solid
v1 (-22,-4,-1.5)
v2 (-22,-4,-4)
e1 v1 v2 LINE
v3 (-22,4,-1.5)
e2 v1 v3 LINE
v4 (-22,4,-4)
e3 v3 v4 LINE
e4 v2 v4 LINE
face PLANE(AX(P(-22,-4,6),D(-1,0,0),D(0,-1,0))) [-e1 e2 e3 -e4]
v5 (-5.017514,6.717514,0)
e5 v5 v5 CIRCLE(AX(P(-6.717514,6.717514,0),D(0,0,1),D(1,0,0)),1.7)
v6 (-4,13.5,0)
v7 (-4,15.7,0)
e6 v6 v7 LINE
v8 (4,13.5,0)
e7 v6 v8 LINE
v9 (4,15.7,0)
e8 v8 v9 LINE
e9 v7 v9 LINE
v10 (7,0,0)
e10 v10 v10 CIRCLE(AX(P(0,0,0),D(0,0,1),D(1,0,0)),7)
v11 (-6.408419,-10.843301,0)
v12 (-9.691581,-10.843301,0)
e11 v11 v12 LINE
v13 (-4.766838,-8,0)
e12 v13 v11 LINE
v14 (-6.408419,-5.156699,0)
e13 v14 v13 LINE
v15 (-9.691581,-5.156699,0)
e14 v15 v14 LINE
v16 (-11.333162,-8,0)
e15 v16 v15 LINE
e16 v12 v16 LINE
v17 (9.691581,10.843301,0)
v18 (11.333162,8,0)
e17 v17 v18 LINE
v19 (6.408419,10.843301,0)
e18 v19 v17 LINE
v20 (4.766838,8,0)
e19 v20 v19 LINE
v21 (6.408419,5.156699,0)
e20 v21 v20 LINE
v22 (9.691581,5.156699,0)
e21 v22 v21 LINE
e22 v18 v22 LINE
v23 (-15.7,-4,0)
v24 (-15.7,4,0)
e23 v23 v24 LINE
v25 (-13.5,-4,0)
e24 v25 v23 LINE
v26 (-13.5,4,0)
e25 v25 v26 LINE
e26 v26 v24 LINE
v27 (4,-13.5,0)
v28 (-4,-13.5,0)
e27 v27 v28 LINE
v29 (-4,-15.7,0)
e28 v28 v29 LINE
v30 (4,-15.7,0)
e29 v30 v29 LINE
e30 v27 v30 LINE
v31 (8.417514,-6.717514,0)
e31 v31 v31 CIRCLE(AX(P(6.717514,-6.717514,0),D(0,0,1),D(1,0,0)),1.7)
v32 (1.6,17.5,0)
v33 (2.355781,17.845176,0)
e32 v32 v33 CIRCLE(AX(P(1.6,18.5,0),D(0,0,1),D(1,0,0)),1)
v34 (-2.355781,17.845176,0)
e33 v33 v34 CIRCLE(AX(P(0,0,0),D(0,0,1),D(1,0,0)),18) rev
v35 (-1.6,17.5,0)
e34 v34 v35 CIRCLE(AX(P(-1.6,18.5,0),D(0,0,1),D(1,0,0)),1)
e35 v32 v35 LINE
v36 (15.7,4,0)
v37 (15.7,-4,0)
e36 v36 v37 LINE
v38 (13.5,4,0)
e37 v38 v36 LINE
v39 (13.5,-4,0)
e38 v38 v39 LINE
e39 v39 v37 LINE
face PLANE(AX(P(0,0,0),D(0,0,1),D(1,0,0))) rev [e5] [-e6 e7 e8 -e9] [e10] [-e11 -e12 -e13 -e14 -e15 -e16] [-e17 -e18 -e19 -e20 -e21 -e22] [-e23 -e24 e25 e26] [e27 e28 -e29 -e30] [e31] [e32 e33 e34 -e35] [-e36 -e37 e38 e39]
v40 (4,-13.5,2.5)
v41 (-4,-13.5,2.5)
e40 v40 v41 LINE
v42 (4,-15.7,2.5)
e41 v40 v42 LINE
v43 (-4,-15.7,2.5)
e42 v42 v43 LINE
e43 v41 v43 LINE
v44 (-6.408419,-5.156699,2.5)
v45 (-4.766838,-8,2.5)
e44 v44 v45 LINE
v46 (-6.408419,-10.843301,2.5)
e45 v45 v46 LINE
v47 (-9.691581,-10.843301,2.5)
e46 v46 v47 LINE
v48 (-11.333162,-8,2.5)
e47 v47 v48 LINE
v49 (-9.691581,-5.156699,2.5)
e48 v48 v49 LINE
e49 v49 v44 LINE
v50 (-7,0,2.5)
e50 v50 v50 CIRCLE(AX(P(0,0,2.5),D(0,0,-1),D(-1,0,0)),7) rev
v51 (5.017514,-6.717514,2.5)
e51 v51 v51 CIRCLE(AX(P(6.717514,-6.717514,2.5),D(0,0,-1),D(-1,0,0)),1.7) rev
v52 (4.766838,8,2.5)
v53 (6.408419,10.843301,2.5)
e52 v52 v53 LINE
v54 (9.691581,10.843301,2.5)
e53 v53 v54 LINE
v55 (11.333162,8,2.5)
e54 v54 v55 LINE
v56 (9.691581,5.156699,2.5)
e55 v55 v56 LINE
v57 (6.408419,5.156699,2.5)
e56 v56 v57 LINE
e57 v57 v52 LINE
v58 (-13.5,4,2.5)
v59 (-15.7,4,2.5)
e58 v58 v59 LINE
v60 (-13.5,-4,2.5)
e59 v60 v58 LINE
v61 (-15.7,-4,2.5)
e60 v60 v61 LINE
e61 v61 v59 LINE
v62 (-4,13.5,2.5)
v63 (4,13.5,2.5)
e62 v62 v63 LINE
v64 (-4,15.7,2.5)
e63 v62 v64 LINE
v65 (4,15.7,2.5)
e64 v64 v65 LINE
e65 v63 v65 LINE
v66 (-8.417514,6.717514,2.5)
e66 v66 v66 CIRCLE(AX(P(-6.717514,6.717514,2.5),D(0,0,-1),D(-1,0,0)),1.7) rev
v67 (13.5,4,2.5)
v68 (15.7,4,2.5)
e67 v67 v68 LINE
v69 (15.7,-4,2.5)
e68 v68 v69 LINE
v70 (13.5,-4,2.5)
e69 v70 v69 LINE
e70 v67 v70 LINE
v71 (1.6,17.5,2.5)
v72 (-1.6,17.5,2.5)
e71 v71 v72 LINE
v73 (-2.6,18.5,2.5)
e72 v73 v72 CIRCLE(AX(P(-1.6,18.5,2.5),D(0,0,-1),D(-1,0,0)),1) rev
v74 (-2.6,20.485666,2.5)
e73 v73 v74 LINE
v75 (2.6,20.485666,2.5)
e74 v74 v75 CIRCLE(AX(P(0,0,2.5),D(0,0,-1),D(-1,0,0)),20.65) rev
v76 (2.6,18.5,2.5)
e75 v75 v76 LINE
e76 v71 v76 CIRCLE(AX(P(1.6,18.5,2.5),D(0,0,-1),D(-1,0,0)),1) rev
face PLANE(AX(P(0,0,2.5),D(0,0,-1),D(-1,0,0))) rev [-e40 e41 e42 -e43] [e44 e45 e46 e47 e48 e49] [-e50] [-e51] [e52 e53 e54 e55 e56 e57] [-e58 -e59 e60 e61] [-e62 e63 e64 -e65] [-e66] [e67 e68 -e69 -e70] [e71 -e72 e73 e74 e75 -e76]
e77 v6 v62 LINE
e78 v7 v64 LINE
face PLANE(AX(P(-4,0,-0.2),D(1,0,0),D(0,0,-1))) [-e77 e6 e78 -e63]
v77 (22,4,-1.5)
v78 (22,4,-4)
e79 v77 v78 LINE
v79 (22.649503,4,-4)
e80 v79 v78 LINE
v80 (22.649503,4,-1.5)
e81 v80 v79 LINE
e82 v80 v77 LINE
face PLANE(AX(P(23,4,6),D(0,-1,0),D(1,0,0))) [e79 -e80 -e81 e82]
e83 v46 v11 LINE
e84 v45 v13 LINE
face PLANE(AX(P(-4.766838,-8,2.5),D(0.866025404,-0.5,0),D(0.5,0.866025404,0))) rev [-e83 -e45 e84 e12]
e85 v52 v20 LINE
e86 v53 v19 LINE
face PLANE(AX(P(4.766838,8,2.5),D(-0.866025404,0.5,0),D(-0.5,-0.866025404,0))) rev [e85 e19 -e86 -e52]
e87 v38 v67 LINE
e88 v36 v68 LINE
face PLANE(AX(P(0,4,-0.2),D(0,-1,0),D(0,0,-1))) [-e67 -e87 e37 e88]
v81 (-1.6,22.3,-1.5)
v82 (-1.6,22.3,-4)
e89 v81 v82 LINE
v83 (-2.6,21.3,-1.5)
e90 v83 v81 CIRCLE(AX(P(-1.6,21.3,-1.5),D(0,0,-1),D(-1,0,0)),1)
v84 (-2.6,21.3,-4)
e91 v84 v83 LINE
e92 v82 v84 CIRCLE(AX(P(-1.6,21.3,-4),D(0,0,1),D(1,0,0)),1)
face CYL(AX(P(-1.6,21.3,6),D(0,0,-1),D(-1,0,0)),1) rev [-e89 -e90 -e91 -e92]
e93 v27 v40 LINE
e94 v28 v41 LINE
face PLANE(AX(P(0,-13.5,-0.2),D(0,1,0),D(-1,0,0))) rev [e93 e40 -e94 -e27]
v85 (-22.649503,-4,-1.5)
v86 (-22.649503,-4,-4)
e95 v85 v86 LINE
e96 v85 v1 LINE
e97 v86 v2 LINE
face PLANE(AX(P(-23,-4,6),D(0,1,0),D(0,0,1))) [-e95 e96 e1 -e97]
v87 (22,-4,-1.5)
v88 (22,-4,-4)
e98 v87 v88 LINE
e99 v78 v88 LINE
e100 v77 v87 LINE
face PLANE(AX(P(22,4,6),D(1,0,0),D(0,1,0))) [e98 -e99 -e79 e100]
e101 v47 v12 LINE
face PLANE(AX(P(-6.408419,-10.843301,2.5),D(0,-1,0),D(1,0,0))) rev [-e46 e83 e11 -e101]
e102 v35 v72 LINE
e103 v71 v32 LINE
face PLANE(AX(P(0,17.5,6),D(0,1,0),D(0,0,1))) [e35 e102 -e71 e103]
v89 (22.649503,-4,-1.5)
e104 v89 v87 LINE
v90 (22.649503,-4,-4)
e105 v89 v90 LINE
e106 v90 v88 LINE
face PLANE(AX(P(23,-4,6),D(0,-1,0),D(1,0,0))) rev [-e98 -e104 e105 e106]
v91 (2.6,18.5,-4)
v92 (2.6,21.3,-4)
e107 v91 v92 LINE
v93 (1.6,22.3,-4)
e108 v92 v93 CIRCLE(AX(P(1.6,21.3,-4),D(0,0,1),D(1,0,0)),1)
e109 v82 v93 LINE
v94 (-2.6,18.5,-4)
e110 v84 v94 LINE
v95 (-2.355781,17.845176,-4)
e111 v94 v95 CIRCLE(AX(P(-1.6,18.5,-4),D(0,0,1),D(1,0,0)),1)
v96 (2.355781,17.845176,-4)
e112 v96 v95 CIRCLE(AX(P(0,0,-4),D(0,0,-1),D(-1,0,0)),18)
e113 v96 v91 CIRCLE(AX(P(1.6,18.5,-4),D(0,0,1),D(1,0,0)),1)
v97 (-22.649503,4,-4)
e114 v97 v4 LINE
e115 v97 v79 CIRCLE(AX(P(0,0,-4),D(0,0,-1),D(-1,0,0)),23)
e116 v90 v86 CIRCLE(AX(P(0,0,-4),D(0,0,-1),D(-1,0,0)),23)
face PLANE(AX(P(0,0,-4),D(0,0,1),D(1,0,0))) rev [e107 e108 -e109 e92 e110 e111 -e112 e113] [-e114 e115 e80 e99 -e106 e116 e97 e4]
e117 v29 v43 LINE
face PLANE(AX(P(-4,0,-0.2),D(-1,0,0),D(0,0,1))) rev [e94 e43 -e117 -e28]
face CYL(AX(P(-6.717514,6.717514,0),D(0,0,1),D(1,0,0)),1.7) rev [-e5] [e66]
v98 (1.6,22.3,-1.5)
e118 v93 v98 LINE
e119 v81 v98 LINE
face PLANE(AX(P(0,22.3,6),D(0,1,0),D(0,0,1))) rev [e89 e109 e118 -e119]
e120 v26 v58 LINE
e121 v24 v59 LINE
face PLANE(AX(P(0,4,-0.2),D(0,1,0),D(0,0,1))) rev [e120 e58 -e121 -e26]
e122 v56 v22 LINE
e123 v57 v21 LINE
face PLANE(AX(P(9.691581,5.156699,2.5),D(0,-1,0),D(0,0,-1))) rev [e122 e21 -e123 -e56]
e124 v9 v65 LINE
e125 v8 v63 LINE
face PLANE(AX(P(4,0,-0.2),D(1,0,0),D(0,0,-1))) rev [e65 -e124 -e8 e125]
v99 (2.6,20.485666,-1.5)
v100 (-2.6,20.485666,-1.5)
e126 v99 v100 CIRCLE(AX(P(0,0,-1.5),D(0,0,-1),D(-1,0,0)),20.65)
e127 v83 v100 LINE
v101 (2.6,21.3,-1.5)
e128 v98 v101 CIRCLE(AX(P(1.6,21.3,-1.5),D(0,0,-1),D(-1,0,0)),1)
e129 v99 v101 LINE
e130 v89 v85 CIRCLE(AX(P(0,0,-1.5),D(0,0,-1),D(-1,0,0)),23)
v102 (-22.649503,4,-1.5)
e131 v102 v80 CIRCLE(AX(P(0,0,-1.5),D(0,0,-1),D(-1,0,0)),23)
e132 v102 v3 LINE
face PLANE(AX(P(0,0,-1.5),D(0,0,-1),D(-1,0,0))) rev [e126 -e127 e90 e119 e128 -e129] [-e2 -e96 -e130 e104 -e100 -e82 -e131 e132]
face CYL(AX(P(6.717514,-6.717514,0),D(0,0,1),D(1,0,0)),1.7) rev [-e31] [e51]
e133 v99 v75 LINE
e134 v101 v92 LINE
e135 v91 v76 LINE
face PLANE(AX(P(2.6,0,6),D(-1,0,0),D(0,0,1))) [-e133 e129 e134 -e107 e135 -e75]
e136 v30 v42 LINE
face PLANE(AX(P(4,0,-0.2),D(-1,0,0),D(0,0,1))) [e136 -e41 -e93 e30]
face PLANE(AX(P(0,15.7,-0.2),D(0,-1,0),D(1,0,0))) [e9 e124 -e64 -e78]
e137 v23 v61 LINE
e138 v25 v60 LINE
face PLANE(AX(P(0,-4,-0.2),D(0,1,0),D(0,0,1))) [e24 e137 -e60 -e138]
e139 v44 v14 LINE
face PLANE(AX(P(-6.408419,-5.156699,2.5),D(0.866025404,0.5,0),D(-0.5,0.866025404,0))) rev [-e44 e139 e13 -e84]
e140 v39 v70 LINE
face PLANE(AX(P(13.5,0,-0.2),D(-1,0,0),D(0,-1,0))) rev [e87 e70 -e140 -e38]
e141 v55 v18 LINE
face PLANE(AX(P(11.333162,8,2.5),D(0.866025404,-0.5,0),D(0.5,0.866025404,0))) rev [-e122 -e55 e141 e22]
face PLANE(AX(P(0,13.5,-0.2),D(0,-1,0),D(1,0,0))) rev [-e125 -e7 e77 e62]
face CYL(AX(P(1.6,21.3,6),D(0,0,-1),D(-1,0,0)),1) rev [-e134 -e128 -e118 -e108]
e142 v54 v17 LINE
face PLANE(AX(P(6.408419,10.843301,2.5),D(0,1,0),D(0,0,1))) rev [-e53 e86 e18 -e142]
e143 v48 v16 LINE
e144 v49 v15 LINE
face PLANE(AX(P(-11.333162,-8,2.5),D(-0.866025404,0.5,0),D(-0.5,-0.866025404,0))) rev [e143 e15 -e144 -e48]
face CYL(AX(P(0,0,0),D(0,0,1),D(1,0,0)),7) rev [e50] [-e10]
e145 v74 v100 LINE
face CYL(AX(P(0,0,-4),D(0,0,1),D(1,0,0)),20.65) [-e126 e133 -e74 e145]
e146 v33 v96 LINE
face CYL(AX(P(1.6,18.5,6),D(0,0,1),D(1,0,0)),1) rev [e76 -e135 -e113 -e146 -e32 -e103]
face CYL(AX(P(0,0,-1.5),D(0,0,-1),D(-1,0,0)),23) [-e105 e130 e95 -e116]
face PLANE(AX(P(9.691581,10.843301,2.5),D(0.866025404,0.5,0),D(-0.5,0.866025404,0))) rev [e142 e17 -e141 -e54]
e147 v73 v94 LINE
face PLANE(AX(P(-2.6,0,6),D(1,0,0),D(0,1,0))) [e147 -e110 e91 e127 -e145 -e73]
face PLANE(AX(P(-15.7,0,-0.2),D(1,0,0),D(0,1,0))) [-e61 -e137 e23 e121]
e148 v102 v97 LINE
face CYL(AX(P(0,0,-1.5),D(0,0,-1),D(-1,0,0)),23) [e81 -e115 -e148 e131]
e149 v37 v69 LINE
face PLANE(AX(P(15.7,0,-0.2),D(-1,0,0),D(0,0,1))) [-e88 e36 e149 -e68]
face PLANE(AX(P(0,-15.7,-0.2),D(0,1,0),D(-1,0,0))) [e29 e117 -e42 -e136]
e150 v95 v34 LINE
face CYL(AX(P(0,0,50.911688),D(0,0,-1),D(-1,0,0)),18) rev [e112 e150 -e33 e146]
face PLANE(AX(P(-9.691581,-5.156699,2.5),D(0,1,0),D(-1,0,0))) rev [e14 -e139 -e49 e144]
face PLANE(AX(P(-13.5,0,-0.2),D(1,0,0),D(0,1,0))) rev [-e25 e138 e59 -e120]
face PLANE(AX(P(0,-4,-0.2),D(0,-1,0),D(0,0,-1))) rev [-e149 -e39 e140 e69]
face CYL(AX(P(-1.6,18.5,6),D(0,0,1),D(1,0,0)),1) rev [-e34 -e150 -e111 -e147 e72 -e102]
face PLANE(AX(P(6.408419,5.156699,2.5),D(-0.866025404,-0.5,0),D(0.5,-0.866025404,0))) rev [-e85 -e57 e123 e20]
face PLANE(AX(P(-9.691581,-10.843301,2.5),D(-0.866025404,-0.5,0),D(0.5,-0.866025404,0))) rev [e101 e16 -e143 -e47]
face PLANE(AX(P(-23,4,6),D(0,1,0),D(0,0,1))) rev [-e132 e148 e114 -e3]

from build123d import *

# Parameters (mm, degrees)
SKETCH_1_R               = 17.4
EXTRUDE_1_DEPTH          = 5.6
SKETCH_2_R               = 1.7
CUT_EXTRUDE_1_DEPTH      = 26.23648153
SKETCH_3_R               = 7
CUT_EXTRUDE_2_DEPTH      = 26.23648153
SKETCH_4_R               = 2.8
CUT_EXTRUDE_3_DEPTH      = 3
SKETCH_5_R               = 1.7
CUT_EXTRUDE_4_DEPTH      = 26.23648153
CUT_EXTRUDE_5_DEPTH      = 2.5
SKETCH_7_W               = 16.1
SKETCH_7_H               = 16.1
CUT_EXTRUDE_6_DEPTH      = 1.5
CHAMFER_1_SIZE           = 0.5
SKETCH_9_W               = 2.2
SKETCH_9_H               = 8
SKETCH_9_W_2             = 8
SKETCH_9_H_2             = 2.2
CUT_EXTRUDE_7_DEPTH      = 26.281613873
BOSS_EXTRUDE1_DEPTH      = 5.6
BOSS_EXTRUDE1_DEPTH_BACK = 4
SKETCH1_R                = 20.65
SKETCH1_R_2              = 17.4
SKETCH3_R                = 23
SKETCH3_R_2              = 20.65
BOSS_EXTRUDE2_DEPTH      = 2.5
SKETCH4_R                = 18
CUT_EXTRUDE3_DEPTH       = 4
SKETCH5_W                = 1
SKETCH5_H                = 8
CUT_EXTRUDE4_DEPTH       = 10
CUT_EXTRUDE6_DEPTH       = 10
FILLET3_R                = 1
CUT_EXTRUDE7_START       = -3.1
SKETCH10_R               = 23
CUT_EXTRUDE7_DEPTH       = 3.1


with BuildPart() as part:
    # 草图1 → 凸台-拉伸1 (new body)
    with BuildSketch(Plane.XY):
        Circle(SKETCH_1_R)
    extrude(amount=EXTRUDE_1_DEPTH)

    # 草图2 → 切除-拉伸1 (cut, through all)
    with BuildSketch(Plane.XY.offset(5.6)):
        with Locations((-6.717514421, 6.717514421)):
            Circle(SKETCH_2_R)
        with Locations((6.717514421, -6.717514421)):
            Circle(SKETCH_2_R)
    extrude(amount=-CUT_EXTRUDE_1_DEPTH, mode=Mode.SUBTRACT)

    # 草图3 → 切除-拉伸2 (cut, through all)
    with BuildSketch(Plane.XY.offset(5.6)):
        Circle(SKETCH_3_R)
    extrude(amount=-CUT_EXTRUDE_2_DEPTH, mode=Mode.SUBTRACT)

    # 草图4 → 切除-拉伸3 (cut)
    with BuildSketch(Plane.XY.offset(5.6)):
        with Locations((-6.717514421, 6.717514421)):
            Circle(SKETCH_4_R)
        with Locations((6.717514421, -6.717514421)):
            Circle(SKETCH_4_R)
    extrude(amount=-CUT_EXTRUDE_3_DEPTH, mode=Mode.SUBTRACT)

    # 草图5 → 切除-拉伸4 (cut, through all)
    with BuildSketch(Plane.XY.offset(5.6)):
        with Locations((8.05, 8)):
            Circle(SKETCH_5_R)
        with Locations((-8.05, -8)):
            Circle(SKETCH_5_R)
    extrude(amount=-CUT_EXTRUDE_4_DEPTH, mode=Mode.SUBTRACT)

    # 草图6 → 切除-拉伸5 (cut)
    with BuildSketch(Plane(origin=(0, 0, 0), x_dir=(-1, 0, 0), z_dir=(0, 0, -1))):
        Polygon((4.766838493, -8), (6.408419246, -10.84330127), (9.691580754, -10.84330127), (11.333161507, -8), (9.691580754, -5.15669873), (6.408419246, -5.15669873), align=None)
        Polygon((-4.766838493, 8), (-6.408419246, 10.84330127), (-9.691580754, 10.84330127), (-11.333161507, 8), (-9.691580754, 5.15669873), (-6.408419246, 5.15669873), align=None)
    extrude(amount=-CUT_EXTRUDE_5_DEPTH, mode=Mode.SUBTRACT)

    # 草图7 → 切除-拉伸6 (cut)
    with BuildSketch(Plane.XY.offset(5.6)):
        Rectangle(SKETCH_7_W, SKETCH_7_H)
    extrude(amount=-CUT_EXTRUDE_6_DEPTH, mode=Mode.SUBTRACT)

    # 倒角1
    chamfer_1_edges = [part.edges().sort_by_distance(p)[0] for p in [
        (8.05, 1.022551258, 5.6),
        (1.047918985, 8.05, 5.6),
        (-8.05, -1.022551258, 5.6),
        (-1.047918985, -8.05, 5.6),
    ]]
    chamfer(chamfer_1_edges, length=CHAMFER_1_SIZE)

    # 草图8 → 旋转1 (revolve)
    with BuildSketch(Plane(origin=(0, 0, 0), x_dir=(0, 0, -1), z_dir=(1, 0, 0)), mode=Mode.PRIVATE) as revolve_1_sk:
        Polygon((0, 17.4), (0, 17.2), (0.2, 17.4), align=None)
    revolve(revolve_1_sk.sketch.rotate(Axis((0, 0, 0), (0, 0, 1)), 90), axis=Axis((0, 0, 0), (0, 0, 1)))

    # 草图9 → 切除-拉伸7 (cut, through all)
    with BuildSketch(Plane.XY.offset(5.6)):
        with Locations((14.6, 0)):
            Rectangle(SKETCH_9_W, SKETCH_9_H)
        with Locations((0, 14.6)):
            Rectangle(SKETCH_9_W_2, SKETCH_9_H_2)
        with Locations((-14.6, 0)):
            Rectangle(SKETCH_9_W, SKETCH_9_H)
        with Locations((0, -14.6)):
            Rectangle(SKETCH_9_W_2, SKETCH_9_H_2)
    extrude(amount=-CUT_EXTRUDE_7_DEPTH, mode=Mode.SUBTRACT)

    # Sketch1 → Boss-Extrude1 (add, two sides: drawn at the far end of the back side and taken through both)
    with BuildSketch(Plane.XY.offset(-BOSS_EXTRUDE1_DEPTH_BACK)):
        Circle(SKETCH1_R)
        Circle(SKETCH1_R_2, mode=Mode.SUBTRACT)
    extrude(amount=BOSS_EXTRUDE1_DEPTH + BOSS_EXTRUDE1_DEPTH_BACK)

    # Sketch3 → Boss-Extrude2 (add)
    with BuildSketch(Plane(origin=(0, 0, -4), x_dir=(-1, 0, 0), z_dir=(0, 0, -1))):
        Circle(SKETCH3_R)
        with Locations(Location((0, 0, 0), (0, 0, 180))):
            Circle(SKETCH3_R_2, mode=Mode.SUBTRACT)
    extrude(amount=-BOSS_EXTRUDE2_DEPTH)

    # Sketch4 → Cut-Extrude3 (cut)
    with BuildSketch(Plane(origin=(0, 0, -4), x_dir=(-1, 0, 0), z_dir=(0, 0, -1))):
        Circle(SKETCH4_R)
    extrude(amount=-CUT_EXTRUDE3_DEPTH, mode=Mode.SUBTRACT)

    # Sketch5 → Cut-Extrude4 (cut)
    with BuildSketch(Plane(origin=(0, 0, -4), x_dir=(-1, 0, 0), z_dir=(0, 0, -1))):
        with Locations((22.5, 0)):
            Rectangle(SKETCH5_W, SKETCH5_H)
        with Locations((-22.5, 0)):
            Rectangle(SKETCH5_W, SKETCH5_H)
    extrude(amount=-CUT_EXTRUDE4_DEPTH, mode=Mode.SUBTRACT)

    # Sketch7 → Cut-Extrude6 (cut)
    with BuildSketch(Plane(origin=(0, 0, -4), x_dir=(-1, 0, 0), z_dir=(0, 0, -1))):
        with BuildLine():
            Line((0, 18), (0, 22.3))
            Line((0, 22.3), (-2.6, 22.3))
            Line((-2.6, 22.3), (-2.6, 17.811232411))
            ThreePointArc((-2.6, 17.811232411), (-1.303421766, 17.952746077), (0, 18))
        make_face()
        with BuildLine():
            Line((0, 17.5), (0, 18))
            ThreePointArc((0, 18), (-1.303421766, 17.952746077), (-2.6, 17.811232411))
            Line((-2.6, 17.811232411), (-2.6, 17.5))
            Line((-2.6, 17.5), (0, 17.5))
        make_face()
        with BuildLine():
            Line((2.6, 22.3), (0, 22.3))
            Line((0, 22.3), (0, 18))
            ThreePointArc((0, 18), (1.303421766, 17.952746077), (2.6, 17.811232411))
            Line((2.6, 17.811232411), (2.6, 22.3))
        make_face()
        with BuildLine():
            ThreePointArc((2.6, 17.811232411), (1.303421766, 17.952746077), (0, 18))
            Line((0, 18), (0, 17.5))
            Line((0, 17.5), (2.6, 17.5))
            Line((2.6, 17.5), (2.6, 17.811232411))
        make_face()
    extrude(amount=-CUT_EXTRUDE6_DEPTH, mode=Mode.SUBTRACT)

    # Fillet3
    # the kernel refuses this fillet: 1 mm, written as the material it adds along each edge
    with BuildSketch(Plane(origin=(2.6, 22.3, -4), x_dir=(-1, 0, 0), z_dir=(0, 0, 1))) as fillet3_piece_1:
        with BuildLine():
            CenterArc((FILLET3_R, FILLET3_R), FILLET3_R, 180, 90)
            Line((0, FILLET3_R), (-FILLET3_R * 0.02, FILLET3_R))
            Line((-FILLET3_R * 0.02, FILLET3_R), (-FILLET3_R * 0.02, -FILLET3_R * 0.02))
            Line((-FILLET3_R * 0.02, -FILLET3_R * 0.02), (FILLET3_R, -FILLET3_R * 0.02))
            Line((FILLET3_R, -FILLET3_R * 0.02), (FILLET3_R, 0))
        make_face()
    extrude(amount=2.5)
    with BuildSketch(Plane(origin=(-2.6, 22.3, -4), x_dir=(1, 0, 0), z_dir=(0, 0, 1))) as fillet3_piece_2:
        with BuildLine():
            CenterArc((FILLET3_R, -FILLET3_R), FILLET3_R, 90, 90)
            Line((0, -FILLET3_R), (-FILLET3_R * 0.02, -FILLET3_R))
            Line((-FILLET3_R * 0.02, -FILLET3_R), (-FILLET3_R * 0.02, FILLET3_R * 0.02))
            Line((-FILLET3_R * 0.02, FILLET3_R * 0.02), (FILLET3_R, FILLET3_R * 0.02))
            Line((FILLET3_R, FILLET3_R * 0.02), (FILLET3_R, 0))
        make_face()
    extrude(amount=2.5)
    with BuildSketch(Plane(origin=(-2.6, 17.5, -6), x_dir=(0, 1, 0), z_dir=(0, 0, 1))) as fillet3_piece_3_section:
        with BuildLine():
            CenterArc((FILLET3_R, -FILLET3_R), FILLET3_R, 90, 90)
            Line((0, -FILLET3_R), (-FILLET3_R * 0.02, -FILLET3_R))
            Line((-FILLET3_R * 0.02, -FILLET3_R), (-FILLET3_R * 0.02, FILLET3_R * 0.02))
            Line((-FILLET3_R * 0.02, FILLET3_R * 0.02), (FILLET3_R, FILLET3_R * 0.02))
            Line((FILLET3_R, FILLET3_R * 0.02), (FILLET3_R, 0))
        make_face()
    fillet3_piece_3 = extrude(amount=11.6, mode=Mode.PRIVATE)
    fillet3_piece_3 = split(fillet3_piece_3, bisect_by=Plane(origin=(-2.544482942, 18.024809788, 0), z_dir=(0, 0, -1)), keep=Keep.TOP, mode=Mode.PRIVATE)
    fillet3_piece_3 = fillet3_piece_3 - Plane(origin=(0, 0, -2), x_dir=(-1, 0, 0), z_dir=(0, 0, -1)) * Cylinder(18, 28, mode=Mode.PRIVATE)
    fillet3_piece_3 = split(fillet3_piece_3, bisect_by=Plane(origin=(-2.544482942, 18.024809788, -4), z_dir=(0, 0, 1)), keep=Keep.TOP, mode=Mode.PRIVATE)
    add(fillet3_piece_3)
    with BuildSketch(Plane(origin=(-2.6, 17.5, 0), x_dir=(0, 1, 0), z_dir=(0, 0, 1))) as fillet3_piece_4_section:
        with BuildLine():
            CenterArc((FILLET3_R, -FILLET3_R), FILLET3_R, 90, 90)
            Line((0, -FILLET3_R), (-FILLET3_R * 0.02, -FILLET3_R))
            Line((-FILLET3_R * 0.02, -FILLET3_R), (-FILLET3_R * 0.02, FILLET3_R * 0.02))
            Line((-FILLET3_R * 0.02, FILLET3_R * 0.02), (FILLET3_R, FILLET3_R * 0.02))
            Line((FILLET3_R, FILLET3_R * 0.02), (FILLET3_R, 0))
        make_face()
    fillet3_piece_4 = extrude(amount=5.6, mode=Mode.PRIVATE)
    fillet3_piece_4 = fillet3_piece_4 - Plane(origin=(0, 0, 2.8), x_dir=(-1, 0, 0), z_dir=(0, 0, -1)) * Cylinder(18, 16, mode=Mode.PRIVATE)
    add(fillet3_piece_4)
    with BuildSketch(Plane(origin=(-2.6, 17.5, 0), x_dir=(0, 1, 0), z_dir=(0, 0, 1))) as fillet3_piece_5_section:
        with BuildLine():
            CenterArc((FILLET3_R, -FILLET3_R), FILLET3_R, 90, 90)
            Line((0, -FILLET3_R), (-FILLET3_R * 0.02, -FILLET3_R))
            Line((-FILLET3_R * 0.02, -FILLET3_R), (-FILLET3_R * 0.02, FILLET3_R * 0.02))
            Line((-FILLET3_R * 0.02, FILLET3_R * 0.02), (FILLET3_R, FILLET3_R * 0.02))
            Line((FILLET3_R, FILLET3_R * 0.02), (FILLET3_R, 0))
        make_face()
    fillet3_piece_5 = extrude(amount=5.6, mode=Mode.PRIVATE)
    fillet3_piece_5 = fillet3_piece_5 & Plane(origin=(0, 0, 2.8), x_dir=(-1, 0, 0), z_dir=(0, 0, -1)) * Cylinder(18, 16, mode=Mode.PRIVATE)
    add(fillet3_piece_5)
    with BuildSketch(Plane(origin=(2.6, 17.5, -6), x_dir=(-1, 0, 0), z_dir=(0, 0, 1))) as fillet3_piece_6_section:
        with BuildLine():
            CenterArc((FILLET3_R, -FILLET3_R), FILLET3_R, 90, 90)
            Line((0, -FILLET3_R), (-FILLET3_R * 0.02, -FILLET3_R))
            Line((-FILLET3_R * 0.02, -FILLET3_R), (-FILLET3_R * 0.02, FILLET3_R * 0.02))
            Line((-FILLET3_R * 0.02, FILLET3_R * 0.02), (FILLET3_R, FILLET3_R * 0.02))
            Line((FILLET3_R, FILLET3_R * 0.02), (FILLET3_R, 0))
        make_face()
    fillet3_piece_6 = extrude(amount=11.6, mode=Mode.PRIVATE)
    fillet3_piece_6 = split(fillet3_piece_6, bisect_by=Plane(origin=(2.544482942, 18.024809788, 0), z_dir=(0, 0, -1)), keep=Keep.TOP, mode=Mode.PRIVATE)
    fillet3_piece_6 = fillet3_piece_6 - Plane(origin=(0, 0, -2), x_dir=(-1, 0, 0), z_dir=(0, 0, -1)) * Cylinder(18, 28, mode=Mode.PRIVATE)
    fillet3_piece_6 = split(fillet3_piece_6, bisect_by=Plane(origin=(2.544482942, 18.024809788, -4), z_dir=(0, 0, 1)), keep=Keep.TOP, mode=Mode.PRIVATE)
    add(fillet3_piece_6)
    with BuildSketch(Plane(origin=(2.6, 17.5, 0), x_dir=(-1, 0, 0), z_dir=(0, 0, 1))) as fillet3_piece_7_section:
        with BuildLine():
            CenterArc((FILLET3_R, -FILLET3_R), FILLET3_R, 90, 90)
            Line((0, -FILLET3_R), (-FILLET3_R * 0.02, -FILLET3_R))
            Line((-FILLET3_R * 0.02, -FILLET3_R), (-FILLET3_R * 0.02, FILLET3_R * 0.02))
            Line((-FILLET3_R * 0.02, FILLET3_R * 0.02), (FILLET3_R, FILLET3_R * 0.02))
            Line((FILLET3_R, FILLET3_R * 0.02), (FILLET3_R, 0))
        make_face()
    fillet3_piece_7 = extrude(amount=5.6, mode=Mode.PRIVATE)
    fillet3_piece_7 = fillet3_piece_7 & Plane(origin=(0, 0, 2.8), x_dir=(-1, 0, 0), z_dir=(0, 0, -1)) * Cylinder(18, 16, mode=Mode.PRIVATE)
    add(fillet3_piece_7)
    with BuildSketch(Plane(origin=(2.6, 17.5, 0), x_dir=(-1, 0, 0), z_dir=(0, 0, 1))) as fillet3_piece_8_section:
        with BuildLine():
            CenterArc((FILLET3_R, -FILLET3_R), FILLET3_R, 90, 90)
            Line((0, -FILLET3_R), (-FILLET3_R * 0.02, -FILLET3_R))
            Line((-FILLET3_R * 0.02, -FILLET3_R), (-FILLET3_R * 0.02, FILLET3_R * 0.02))
            Line((-FILLET3_R * 0.02, FILLET3_R * 0.02), (FILLET3_R, FILLET3_R * 0.02))
            Line((FILLET3_R, FILLET3_R * 0.02), (FILLET3_R, 0))
        make_face()
    fillet3_piece_8 = extrude(amount=5.6, mode=Mode.PRIVATE)
    fillet3_piece_8 = fillet3_piece_8 - Plane(origin=(0, 0, 2.8), x_dir=(-1, 0, 0), z_dir=(0, 0, -1)) * Cylinder(18, 16, mode=Mode.PRIVATE)
    add(fillet3_piece_8)

    # Sketch10 → Cut-Extrude7 (cut)
    with BuildSketch(Plane.XY.offset(5.6).offset(CUT_EXTRUDE7_START)):
        Circle(SKETCH10_R)
    extrude(amount=CUT_EXTRUDE7_DEPTH, mode=Mode.SUBTRACT)


solid = part.part
